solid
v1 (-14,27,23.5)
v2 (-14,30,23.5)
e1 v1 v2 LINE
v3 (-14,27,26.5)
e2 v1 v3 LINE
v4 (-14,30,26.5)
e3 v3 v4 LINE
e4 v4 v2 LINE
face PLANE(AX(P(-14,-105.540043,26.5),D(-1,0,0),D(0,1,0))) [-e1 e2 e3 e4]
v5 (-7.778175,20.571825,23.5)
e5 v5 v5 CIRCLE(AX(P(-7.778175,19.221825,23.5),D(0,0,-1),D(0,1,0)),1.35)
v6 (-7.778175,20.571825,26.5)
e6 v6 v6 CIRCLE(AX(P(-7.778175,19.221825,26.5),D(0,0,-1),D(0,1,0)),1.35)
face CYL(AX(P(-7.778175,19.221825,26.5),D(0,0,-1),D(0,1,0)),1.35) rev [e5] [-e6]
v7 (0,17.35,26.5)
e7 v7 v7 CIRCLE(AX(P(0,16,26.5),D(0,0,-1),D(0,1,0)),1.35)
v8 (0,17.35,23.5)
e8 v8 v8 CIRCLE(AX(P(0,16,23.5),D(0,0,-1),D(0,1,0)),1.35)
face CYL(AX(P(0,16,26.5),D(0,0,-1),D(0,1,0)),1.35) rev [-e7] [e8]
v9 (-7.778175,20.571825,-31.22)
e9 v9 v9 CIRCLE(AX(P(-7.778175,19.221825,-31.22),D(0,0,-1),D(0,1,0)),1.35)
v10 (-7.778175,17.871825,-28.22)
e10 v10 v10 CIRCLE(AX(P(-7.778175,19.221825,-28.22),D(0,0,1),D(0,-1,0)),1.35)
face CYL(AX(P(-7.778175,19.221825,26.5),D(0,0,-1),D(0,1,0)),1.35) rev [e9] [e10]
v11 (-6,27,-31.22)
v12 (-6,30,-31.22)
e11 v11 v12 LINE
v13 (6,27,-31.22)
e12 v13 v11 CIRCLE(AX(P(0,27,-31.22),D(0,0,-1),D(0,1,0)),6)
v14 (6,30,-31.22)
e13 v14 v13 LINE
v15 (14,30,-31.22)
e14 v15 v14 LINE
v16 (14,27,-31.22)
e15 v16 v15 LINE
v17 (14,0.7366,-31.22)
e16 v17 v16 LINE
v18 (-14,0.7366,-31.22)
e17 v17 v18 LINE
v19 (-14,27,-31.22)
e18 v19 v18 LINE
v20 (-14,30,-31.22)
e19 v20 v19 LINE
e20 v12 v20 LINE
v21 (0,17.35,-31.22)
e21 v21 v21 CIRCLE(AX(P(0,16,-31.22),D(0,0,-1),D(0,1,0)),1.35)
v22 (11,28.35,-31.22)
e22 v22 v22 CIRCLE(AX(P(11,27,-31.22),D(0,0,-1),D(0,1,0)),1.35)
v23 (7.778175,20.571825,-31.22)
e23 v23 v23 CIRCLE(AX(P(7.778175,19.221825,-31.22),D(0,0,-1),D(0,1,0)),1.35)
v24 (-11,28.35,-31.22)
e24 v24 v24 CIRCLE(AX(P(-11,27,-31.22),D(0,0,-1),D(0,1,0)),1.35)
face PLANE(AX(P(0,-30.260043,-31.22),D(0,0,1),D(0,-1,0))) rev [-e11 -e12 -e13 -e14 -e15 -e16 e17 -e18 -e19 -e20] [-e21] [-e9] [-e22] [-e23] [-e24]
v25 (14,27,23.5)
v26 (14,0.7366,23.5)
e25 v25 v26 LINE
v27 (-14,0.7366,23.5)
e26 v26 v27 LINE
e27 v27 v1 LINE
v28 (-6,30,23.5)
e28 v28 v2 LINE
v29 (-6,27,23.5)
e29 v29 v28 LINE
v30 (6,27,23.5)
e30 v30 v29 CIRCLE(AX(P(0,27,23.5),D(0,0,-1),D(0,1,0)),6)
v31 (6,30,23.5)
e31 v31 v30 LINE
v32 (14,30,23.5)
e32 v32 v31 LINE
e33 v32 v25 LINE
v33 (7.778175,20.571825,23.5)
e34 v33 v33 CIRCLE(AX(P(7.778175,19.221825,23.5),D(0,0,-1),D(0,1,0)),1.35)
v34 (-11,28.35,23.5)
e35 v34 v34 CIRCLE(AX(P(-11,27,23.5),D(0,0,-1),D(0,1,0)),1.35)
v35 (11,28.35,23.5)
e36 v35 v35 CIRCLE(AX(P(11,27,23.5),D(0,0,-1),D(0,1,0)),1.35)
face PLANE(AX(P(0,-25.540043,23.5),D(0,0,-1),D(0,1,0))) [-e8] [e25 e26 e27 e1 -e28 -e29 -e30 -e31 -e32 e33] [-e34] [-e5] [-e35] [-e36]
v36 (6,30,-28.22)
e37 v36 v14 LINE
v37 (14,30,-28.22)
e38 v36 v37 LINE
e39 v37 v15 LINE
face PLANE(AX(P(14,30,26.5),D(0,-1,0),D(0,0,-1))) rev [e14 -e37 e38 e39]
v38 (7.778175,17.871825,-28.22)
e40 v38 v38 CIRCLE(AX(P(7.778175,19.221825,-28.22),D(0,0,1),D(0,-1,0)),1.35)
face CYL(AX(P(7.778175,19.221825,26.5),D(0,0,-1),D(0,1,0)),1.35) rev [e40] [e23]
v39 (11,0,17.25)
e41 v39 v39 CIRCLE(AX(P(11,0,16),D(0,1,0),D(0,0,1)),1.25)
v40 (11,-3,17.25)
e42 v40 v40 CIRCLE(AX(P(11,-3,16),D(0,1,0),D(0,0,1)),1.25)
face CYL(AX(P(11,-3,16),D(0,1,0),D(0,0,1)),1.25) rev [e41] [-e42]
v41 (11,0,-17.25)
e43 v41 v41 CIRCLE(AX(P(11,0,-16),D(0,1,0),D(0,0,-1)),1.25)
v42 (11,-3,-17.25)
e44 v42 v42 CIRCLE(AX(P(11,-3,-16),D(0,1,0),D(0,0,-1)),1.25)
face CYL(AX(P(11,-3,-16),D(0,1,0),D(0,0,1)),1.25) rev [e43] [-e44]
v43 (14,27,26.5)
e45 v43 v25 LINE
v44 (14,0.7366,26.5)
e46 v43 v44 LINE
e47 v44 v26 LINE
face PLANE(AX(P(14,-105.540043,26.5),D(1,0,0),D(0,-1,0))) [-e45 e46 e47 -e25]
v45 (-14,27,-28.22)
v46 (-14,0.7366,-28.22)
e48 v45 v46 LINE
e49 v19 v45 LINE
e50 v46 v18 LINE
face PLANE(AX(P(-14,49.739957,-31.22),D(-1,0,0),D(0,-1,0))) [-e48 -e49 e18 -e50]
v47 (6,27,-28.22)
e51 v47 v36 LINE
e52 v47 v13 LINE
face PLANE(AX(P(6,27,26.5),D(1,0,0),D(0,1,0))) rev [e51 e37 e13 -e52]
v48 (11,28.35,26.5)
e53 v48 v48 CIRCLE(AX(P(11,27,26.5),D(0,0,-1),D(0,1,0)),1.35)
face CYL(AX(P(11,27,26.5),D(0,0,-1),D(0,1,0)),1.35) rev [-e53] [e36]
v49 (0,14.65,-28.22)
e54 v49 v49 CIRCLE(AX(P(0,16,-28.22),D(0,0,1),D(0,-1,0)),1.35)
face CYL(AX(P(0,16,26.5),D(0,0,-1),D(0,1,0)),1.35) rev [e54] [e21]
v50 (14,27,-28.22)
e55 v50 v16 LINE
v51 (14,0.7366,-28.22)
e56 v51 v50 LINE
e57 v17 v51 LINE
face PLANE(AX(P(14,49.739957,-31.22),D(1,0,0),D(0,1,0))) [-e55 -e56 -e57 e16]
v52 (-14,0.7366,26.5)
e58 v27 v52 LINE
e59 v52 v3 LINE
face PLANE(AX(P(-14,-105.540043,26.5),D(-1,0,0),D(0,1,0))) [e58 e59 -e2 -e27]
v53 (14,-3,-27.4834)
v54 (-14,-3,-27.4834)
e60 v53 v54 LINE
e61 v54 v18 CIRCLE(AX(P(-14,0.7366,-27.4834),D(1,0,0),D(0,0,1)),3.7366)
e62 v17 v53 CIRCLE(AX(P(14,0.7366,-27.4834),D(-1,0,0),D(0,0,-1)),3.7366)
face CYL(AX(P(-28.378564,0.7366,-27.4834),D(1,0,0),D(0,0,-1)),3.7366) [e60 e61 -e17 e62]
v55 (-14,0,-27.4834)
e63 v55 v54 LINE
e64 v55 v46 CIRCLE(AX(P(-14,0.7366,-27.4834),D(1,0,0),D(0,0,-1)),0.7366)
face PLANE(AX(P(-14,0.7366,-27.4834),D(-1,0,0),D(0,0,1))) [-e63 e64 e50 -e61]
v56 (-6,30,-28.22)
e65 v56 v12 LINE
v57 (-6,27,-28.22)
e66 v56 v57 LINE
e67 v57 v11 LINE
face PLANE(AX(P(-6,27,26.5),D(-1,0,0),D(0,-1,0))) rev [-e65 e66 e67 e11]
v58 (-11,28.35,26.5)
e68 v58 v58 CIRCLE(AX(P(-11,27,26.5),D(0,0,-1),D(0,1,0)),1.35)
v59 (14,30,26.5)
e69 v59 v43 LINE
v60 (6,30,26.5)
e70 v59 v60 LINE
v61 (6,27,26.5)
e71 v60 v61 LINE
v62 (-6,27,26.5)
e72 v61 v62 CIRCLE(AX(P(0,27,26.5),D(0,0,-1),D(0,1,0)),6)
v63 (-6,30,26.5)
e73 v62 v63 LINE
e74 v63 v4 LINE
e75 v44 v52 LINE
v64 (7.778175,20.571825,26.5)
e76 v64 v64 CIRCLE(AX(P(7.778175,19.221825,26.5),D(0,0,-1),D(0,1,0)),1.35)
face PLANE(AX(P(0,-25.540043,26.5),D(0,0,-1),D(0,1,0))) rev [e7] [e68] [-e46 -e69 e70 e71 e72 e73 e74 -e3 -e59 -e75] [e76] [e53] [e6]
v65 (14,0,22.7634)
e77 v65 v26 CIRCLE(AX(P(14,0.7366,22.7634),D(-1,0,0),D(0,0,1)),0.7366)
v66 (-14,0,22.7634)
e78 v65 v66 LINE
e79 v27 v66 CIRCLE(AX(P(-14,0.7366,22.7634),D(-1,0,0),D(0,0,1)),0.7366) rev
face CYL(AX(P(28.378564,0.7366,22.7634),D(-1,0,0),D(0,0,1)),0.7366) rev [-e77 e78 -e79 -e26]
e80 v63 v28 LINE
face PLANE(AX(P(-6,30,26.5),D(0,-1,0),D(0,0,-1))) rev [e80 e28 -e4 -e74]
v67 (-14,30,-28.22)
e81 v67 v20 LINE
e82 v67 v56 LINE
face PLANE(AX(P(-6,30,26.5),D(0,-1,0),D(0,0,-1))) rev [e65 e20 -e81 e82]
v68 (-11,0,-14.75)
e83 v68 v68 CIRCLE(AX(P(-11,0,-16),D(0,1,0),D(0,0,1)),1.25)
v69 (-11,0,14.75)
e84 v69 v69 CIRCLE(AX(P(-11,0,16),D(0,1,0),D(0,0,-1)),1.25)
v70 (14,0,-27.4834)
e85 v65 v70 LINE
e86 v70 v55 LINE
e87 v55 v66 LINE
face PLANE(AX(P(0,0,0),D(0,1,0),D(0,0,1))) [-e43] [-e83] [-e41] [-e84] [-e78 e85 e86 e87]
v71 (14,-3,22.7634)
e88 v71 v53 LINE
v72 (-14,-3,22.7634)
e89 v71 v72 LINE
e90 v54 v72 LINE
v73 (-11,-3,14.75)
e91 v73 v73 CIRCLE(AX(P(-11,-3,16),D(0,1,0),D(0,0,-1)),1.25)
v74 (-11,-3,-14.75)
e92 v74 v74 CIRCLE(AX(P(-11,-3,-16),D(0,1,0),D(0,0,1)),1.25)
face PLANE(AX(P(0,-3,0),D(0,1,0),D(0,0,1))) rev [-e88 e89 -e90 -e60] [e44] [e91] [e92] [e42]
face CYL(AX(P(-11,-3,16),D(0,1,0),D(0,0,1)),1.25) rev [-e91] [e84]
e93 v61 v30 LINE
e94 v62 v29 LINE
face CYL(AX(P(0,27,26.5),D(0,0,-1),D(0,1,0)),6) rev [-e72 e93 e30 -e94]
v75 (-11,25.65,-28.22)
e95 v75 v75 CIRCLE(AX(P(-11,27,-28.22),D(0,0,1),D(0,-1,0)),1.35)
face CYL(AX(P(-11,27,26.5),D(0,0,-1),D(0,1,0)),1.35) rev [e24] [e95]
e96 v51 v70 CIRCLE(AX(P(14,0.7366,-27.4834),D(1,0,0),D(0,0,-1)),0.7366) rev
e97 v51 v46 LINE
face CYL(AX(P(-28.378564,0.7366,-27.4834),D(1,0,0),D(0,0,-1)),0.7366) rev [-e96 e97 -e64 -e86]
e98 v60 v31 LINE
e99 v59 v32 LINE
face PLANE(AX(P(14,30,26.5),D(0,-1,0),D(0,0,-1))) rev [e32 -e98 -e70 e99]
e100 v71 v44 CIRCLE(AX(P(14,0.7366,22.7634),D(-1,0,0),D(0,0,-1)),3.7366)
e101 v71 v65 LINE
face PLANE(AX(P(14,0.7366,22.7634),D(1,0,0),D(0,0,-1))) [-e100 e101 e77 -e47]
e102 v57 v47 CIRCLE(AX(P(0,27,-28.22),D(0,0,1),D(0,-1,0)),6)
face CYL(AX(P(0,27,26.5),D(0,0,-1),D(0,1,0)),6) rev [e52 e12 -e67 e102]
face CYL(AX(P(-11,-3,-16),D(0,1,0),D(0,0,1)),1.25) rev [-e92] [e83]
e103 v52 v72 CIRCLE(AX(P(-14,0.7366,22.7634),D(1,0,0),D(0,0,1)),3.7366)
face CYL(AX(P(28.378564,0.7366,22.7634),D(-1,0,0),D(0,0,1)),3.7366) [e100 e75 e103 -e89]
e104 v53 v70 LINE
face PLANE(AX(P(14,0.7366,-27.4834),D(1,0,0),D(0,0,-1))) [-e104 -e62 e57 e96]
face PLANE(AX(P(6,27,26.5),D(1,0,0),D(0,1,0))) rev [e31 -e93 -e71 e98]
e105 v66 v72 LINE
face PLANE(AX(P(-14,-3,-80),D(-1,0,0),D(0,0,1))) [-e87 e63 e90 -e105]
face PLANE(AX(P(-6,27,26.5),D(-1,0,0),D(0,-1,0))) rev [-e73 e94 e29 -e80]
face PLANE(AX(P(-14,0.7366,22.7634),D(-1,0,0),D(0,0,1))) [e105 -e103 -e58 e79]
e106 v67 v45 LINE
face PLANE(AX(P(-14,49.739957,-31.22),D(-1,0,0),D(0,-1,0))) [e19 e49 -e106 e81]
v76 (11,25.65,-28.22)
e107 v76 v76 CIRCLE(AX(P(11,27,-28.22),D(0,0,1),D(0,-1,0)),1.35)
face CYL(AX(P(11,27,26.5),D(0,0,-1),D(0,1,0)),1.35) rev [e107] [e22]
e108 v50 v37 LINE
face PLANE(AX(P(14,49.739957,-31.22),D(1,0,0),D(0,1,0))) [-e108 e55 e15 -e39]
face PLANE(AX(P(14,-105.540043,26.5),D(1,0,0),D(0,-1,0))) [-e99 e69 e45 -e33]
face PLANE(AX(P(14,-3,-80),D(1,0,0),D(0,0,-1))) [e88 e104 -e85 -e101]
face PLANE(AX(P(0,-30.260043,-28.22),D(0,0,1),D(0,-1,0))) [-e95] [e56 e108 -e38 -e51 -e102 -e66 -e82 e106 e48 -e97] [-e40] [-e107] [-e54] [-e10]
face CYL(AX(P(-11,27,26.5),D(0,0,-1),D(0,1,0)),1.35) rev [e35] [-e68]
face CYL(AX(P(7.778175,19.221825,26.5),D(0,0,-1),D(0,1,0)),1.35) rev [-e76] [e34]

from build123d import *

# Parameters (mm, degrees)
SKETCH_1_W             = 28
SKETCH_1_H             = 160
SKETCH_1_R             = 1.25
SM_BASE_FLANGE_1_DEPTH = 3
OTHER_START            = -14
OTHER_1_DEPTH          = 28
OTHER_1_2_DEPTH        = 28
SKETCH_7_R             = 1.35
CUT_EXTRUDE_1_DEPTH    = 81.582164958


# Read off the part's stored shape, not the designer's step: 绘制的折弯1
# Sheet-metal steps are written as plain solids
with BuildPart() as part:
    # Sketch 1 → 基体-法兰1 (new body)
    with BuildSketch(Plane(origin=(0, 0, 0), x_dir=(1, 0, 0), z_dir=(0, 1, 0))):
        Rectangle(SKETCH_1_W, SKETCH_1_H)
        with Locations(Location((-11, -16, 0), (0, 0, 90))):
            Circle(SKETCH_1_R, mode=Mode.SUBTRACT)
        with Locations(Location((11, -16, 0), (0, 0, 270))):
            Circle(SKETCH_1_R, mode=Mode.SUBTRACT)
        with Locations(Location((11, 16, 0), (0, 0, 90))):
            Circle(SKETCH_1_R, mode=Mode.SUBTRACT)
        with Locations(Location((-11, 16, 0), (0, 0, 270))):
            Circle(SKETCH_1_R, mode=Mode.SUBTRACT)
    extrude(amount=-SM_BASE_FLANGE_1_DEPTH)

    # Other 1 outline → Other 1 (cut)
    with BuildSketch(Plane.YZ.offset(OTHER_START)):
        with BuildLine():
            ThreePointArc((0, -31.146677222), (-2.154295979, -29.850867001), (-3, -27.4834))
            Line((-3, -27.4834), (-3, -80))
            Line((-3, -80), (0, -80))
            Line((0, -80), (0, -31.146677222))
        make_face()
        with BuildLine():
            Line((-3, 80), (-3, 22.7634))
            ThreePointArc((-3, 22.7634), (-2.154295979, 25.130867001), (0, 26.426677222))
            Line((0, 26.426677222), (0, 80))
            Line((0, 80), (-3, 80))
        make_face()
    extrude(amount=OTHER_1_DEPTH, mode=Mode.SUBTRACT)

    # Other 1 2 outline → Other 1 2 (add)
    with BuildSketch(Plane.YZ.offset(OTHER_START)):
        with BuildLine():
            Line((0, -27.4834), (0, -31.146677222))
            ThreePointArc((0, -31.146677222), (0.36647982, -31.201624121), (0.7366, -31.22))
            Line((0.7366, -31.22), (49.739956935, -31.22))
            Line((49.739956935, -31.22), (49.739956935, -28.22))
            Line((49.739956935, -28.22), (0.7366, -28.22))
            ThreePointArc((0.7366, -28.22), (0.215745145, -28.004254855), (0, -27.4834))
        make_face()
        with BuildLine():
            ThreePointArc((0.7366, 26.5), (0.36647982, 26.481624121), (0, 26.426677222))
            Line((0, 26.426677222), (0, 22.7634))
            ThreePointArc((0, 22.7634), (0.215745145, 23.284254855), (0.7366, 23.5))
            Line((0.7366, 23.5), (54.459956935, 23.5))
            Line((54.459956935, 23.5), (54.459956935, 26.5))
            Line((54.459956935, 26.5), (0.7366, 26.5))
        make_face()
    extrude(amount=OTHER_1_2_DEPTH)

    # Sketch 7 → 切除-拉伸1 (cut, through all)
    with BuildSketch(Plane(origin=(0, 0, -31.22), x_dir=(-1, 0, 0), z_dir=(0, 0, -1))):
        with Locations(Location((11, 27, 0), (0, 0, 90))):
            Circle(SKETCH_7_R)
        with Locations(Location((7.778174593, 19.221825407, 0), (0, 0, 90))):
            Circle(SKETCH_7_R)
        with Locations(Location((0, 16, 0), (0, 0, 90))):
            Circle(SKETCH_7_R)
        with Locations(Location((-7.778174593, 19.221825407, 0), (0, 0, 90))):
            Circle(SKETCH_7_R)
        with Locations(Location((-11, 27, 0), (0, 0, 90))):
            Circle(SKETCH_7_R)
        with BuildLine():
            Line((-14, 27), (-32.703539992, 27))
            Line((-32.703539992, 27), (-27.737483214, 57.366036836))
            Line((-27.737483214, 57.366036836), (24.538070134, 57.366036836))
            Line((24.538070134, 57.366036836), (24.538070134, 27))
            Line((24.538070134, 27), (14, 27))
            Line((14, 27), (14, 30))
            Line((14, 30), (6, 30))
            Line((6, 30), (6, 27))
            ThreePointArc((6, 27), (0, 21), (-6, 27))
            Line((-6, 27), (-6, 30))
            Line((-6, 30), (-14, 30))
            Line((-14, 30), (-14, 27))
        make_face()
    extrude(amount=-CUT_EXTRUDE_1_DEPTH, mode=Mode.SUBTRACT)


solid = part.part
